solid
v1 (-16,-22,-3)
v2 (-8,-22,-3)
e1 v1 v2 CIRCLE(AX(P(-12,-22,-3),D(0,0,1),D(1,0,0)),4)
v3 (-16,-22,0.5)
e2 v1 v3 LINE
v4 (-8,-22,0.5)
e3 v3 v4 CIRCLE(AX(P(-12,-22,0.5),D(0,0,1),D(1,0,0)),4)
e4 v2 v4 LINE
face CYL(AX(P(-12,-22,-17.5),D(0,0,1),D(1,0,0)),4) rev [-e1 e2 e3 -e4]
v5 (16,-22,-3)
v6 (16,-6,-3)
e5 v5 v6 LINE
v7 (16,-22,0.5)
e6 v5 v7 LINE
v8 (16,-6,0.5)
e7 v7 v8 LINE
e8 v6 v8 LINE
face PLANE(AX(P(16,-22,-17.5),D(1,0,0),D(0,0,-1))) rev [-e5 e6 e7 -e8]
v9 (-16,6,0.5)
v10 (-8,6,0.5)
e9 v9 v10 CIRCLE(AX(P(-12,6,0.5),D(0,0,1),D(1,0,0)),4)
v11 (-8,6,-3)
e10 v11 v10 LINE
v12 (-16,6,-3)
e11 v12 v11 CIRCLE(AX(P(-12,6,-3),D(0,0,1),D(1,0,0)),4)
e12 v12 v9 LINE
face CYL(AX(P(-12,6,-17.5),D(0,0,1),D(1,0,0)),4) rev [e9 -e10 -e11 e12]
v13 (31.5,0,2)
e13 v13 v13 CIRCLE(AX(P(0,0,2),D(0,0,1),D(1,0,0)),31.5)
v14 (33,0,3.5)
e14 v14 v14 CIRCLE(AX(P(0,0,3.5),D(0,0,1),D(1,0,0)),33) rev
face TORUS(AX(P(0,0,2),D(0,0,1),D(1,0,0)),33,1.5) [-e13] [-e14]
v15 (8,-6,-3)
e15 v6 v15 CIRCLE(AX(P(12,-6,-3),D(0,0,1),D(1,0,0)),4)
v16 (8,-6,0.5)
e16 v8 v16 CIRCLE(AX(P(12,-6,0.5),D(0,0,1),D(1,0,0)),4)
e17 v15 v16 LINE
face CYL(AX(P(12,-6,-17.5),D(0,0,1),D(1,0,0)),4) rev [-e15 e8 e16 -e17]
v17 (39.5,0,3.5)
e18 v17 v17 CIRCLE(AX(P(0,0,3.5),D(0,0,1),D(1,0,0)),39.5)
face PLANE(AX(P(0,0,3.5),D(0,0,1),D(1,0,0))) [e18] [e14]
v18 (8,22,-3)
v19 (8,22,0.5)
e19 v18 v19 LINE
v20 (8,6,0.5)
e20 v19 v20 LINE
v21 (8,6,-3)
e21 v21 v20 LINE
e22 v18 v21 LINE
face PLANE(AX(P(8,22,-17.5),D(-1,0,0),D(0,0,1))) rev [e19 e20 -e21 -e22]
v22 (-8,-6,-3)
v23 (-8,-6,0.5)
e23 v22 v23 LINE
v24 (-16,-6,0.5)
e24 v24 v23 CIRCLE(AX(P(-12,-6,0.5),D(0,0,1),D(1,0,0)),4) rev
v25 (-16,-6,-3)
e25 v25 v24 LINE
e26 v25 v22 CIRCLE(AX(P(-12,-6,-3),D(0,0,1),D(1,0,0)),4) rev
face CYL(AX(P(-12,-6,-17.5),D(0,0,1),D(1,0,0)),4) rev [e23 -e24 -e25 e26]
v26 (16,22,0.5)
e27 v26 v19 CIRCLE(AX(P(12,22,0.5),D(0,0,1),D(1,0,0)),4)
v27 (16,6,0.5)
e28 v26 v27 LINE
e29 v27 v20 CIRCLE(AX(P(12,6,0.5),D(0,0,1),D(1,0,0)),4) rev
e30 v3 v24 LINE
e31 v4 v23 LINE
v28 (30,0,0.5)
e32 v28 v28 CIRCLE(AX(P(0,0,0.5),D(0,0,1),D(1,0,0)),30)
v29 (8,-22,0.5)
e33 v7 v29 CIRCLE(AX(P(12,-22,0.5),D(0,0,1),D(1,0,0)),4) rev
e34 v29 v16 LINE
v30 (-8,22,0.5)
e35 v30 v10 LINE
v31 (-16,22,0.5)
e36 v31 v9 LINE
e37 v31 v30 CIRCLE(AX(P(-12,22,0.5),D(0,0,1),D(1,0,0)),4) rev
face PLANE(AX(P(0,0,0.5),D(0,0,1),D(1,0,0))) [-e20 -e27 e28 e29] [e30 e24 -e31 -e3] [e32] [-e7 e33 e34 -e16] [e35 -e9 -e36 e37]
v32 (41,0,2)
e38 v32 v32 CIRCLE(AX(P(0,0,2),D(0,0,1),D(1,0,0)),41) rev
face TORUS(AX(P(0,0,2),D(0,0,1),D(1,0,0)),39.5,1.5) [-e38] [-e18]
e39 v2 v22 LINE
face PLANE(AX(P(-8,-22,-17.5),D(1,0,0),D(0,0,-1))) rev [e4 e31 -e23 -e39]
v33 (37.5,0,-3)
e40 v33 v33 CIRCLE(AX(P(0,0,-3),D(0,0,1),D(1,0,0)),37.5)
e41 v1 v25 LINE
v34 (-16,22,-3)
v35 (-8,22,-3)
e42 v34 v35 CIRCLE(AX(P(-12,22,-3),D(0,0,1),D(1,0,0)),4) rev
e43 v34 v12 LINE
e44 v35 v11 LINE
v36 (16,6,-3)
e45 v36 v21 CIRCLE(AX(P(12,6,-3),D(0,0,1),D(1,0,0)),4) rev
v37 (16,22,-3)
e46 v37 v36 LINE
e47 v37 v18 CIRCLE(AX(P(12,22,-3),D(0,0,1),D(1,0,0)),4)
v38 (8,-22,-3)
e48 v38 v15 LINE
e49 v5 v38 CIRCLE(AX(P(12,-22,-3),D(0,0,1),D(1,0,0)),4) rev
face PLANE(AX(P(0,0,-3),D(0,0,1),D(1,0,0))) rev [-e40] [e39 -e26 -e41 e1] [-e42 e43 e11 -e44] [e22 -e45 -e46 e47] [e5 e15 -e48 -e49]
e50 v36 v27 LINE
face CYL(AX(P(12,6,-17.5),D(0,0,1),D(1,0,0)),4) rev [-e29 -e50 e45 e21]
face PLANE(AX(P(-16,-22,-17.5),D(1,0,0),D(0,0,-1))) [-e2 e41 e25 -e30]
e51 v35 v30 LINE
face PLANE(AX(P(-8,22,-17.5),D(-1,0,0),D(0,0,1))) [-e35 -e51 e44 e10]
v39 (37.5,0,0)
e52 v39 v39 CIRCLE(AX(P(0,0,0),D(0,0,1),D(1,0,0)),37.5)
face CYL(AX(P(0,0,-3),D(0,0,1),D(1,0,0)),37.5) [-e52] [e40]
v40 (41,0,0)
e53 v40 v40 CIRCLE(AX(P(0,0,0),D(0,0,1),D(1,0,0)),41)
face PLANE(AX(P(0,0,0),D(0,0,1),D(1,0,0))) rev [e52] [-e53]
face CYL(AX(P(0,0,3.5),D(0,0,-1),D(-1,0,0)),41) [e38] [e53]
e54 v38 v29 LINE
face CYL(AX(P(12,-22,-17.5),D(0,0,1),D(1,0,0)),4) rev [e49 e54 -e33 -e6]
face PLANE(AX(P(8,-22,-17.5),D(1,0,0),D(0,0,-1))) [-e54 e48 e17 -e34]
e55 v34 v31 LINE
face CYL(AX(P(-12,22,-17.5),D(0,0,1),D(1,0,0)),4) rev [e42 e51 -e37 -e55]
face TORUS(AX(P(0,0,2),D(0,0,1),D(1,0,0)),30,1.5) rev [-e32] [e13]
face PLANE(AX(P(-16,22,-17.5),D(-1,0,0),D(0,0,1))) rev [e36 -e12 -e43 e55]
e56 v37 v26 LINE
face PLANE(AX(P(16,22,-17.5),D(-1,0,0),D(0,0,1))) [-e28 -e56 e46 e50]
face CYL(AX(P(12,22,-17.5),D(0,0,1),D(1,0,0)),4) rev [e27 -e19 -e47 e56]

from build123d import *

# Parameters (mm, degrees)
SKETCH1_R           = 41
BOSS_EXTRUDE1_DEPTH = 3.5
SKETCH2_R           = 37.5
BOSS_EXTRUDE2_DEPTH = 3
SKETCH4_R           = 31.5
CUT_EXTRUDE3_DEPTH  = 3
CUT_EXTRUDE4_DEPTH  = 21
FILLET1_R           = 1.5


with BuildPart() as part:
    # Sketch1 → Boss-Extrude1 (new body)
    with BuildSketch(Plane.XY):
        Circle(SKETCH1_R)
    extrude(amount=BOSS_EXTRUDE1_DEPTH)

    # Sketch2 → Boss-Extrude2 (add)
    with BuildSketch(Plane.XY):
        Circle(SKETCH2_R)
    extrude(amount=-BOSS_EXTRUDE2_DEPTH)

    # Sketch4 → Cut-Extrude3 (cut)
    with BuildSketch(Plane.XY.offset(3.5)):
        Circle(SKETCH4_R)
    extrude(amount=-CUT_EXTRUDE3_DEPTH, mode=Mode.SUBTRACT)

    # Sketch5 → Cut-Extrude4 (cut)
    with BuildSketch(Plane.XY.offset(3.5)):
        with BuildLine():
            Line((-16, 22), (-16, 6))
            ThreePointArc((-16, 6), (-12, 2), (-8, 6))
            Line((-8, 6), (-8, 22))
            ThreePointArc((-8, 22), (-12, 26), (-16, 22))
        make_face()
        with BuildLine():
            Line((-8, -22), (-8, -6))
            ThreePointArc((-8, -6), (-12, -2), (-16, -6))
            Line((-16, -6), (-16, -22))
            ThreePointArc((-16, -22), (-12, -26), (-8, -22))
        make_face()
        with BuildLine():
            Line((16, -22), (16, -6))
            ThreePointArc((16, -6), (12, -2), (8, -6))
            Line((8, -6), (8, -22))
            ThreePointArc((8, -22), (12, -26), (16, -22))
        make_face()
        with BuildLine():
            Line((16, 22), (16, 6))
            ThreePointArc((16, 6), (12, 2), (8, 6))
            Line((8, 6), (8, 22))
            ThreePointArc((8, 22), (12, 26), (16, 22))
        make_face()
    extrude(amount=-CUT_EXTRUDE4_DEPTH, mode=Mode.SUBTRACT)

    # Fillet1
    fillet1_edges = [part.edges().sort_by_distance(p)[0] for p in [
        (-31.5, 0, 0.5),
        (-31.5, 0, 3.5),
        (-41, 0, 3.5),
    ]]
    fillet(fillet1_edges, radius=FILLET1_R - 0.0001)  # a hair under: the kernel refuses the full size


solid = part.part
